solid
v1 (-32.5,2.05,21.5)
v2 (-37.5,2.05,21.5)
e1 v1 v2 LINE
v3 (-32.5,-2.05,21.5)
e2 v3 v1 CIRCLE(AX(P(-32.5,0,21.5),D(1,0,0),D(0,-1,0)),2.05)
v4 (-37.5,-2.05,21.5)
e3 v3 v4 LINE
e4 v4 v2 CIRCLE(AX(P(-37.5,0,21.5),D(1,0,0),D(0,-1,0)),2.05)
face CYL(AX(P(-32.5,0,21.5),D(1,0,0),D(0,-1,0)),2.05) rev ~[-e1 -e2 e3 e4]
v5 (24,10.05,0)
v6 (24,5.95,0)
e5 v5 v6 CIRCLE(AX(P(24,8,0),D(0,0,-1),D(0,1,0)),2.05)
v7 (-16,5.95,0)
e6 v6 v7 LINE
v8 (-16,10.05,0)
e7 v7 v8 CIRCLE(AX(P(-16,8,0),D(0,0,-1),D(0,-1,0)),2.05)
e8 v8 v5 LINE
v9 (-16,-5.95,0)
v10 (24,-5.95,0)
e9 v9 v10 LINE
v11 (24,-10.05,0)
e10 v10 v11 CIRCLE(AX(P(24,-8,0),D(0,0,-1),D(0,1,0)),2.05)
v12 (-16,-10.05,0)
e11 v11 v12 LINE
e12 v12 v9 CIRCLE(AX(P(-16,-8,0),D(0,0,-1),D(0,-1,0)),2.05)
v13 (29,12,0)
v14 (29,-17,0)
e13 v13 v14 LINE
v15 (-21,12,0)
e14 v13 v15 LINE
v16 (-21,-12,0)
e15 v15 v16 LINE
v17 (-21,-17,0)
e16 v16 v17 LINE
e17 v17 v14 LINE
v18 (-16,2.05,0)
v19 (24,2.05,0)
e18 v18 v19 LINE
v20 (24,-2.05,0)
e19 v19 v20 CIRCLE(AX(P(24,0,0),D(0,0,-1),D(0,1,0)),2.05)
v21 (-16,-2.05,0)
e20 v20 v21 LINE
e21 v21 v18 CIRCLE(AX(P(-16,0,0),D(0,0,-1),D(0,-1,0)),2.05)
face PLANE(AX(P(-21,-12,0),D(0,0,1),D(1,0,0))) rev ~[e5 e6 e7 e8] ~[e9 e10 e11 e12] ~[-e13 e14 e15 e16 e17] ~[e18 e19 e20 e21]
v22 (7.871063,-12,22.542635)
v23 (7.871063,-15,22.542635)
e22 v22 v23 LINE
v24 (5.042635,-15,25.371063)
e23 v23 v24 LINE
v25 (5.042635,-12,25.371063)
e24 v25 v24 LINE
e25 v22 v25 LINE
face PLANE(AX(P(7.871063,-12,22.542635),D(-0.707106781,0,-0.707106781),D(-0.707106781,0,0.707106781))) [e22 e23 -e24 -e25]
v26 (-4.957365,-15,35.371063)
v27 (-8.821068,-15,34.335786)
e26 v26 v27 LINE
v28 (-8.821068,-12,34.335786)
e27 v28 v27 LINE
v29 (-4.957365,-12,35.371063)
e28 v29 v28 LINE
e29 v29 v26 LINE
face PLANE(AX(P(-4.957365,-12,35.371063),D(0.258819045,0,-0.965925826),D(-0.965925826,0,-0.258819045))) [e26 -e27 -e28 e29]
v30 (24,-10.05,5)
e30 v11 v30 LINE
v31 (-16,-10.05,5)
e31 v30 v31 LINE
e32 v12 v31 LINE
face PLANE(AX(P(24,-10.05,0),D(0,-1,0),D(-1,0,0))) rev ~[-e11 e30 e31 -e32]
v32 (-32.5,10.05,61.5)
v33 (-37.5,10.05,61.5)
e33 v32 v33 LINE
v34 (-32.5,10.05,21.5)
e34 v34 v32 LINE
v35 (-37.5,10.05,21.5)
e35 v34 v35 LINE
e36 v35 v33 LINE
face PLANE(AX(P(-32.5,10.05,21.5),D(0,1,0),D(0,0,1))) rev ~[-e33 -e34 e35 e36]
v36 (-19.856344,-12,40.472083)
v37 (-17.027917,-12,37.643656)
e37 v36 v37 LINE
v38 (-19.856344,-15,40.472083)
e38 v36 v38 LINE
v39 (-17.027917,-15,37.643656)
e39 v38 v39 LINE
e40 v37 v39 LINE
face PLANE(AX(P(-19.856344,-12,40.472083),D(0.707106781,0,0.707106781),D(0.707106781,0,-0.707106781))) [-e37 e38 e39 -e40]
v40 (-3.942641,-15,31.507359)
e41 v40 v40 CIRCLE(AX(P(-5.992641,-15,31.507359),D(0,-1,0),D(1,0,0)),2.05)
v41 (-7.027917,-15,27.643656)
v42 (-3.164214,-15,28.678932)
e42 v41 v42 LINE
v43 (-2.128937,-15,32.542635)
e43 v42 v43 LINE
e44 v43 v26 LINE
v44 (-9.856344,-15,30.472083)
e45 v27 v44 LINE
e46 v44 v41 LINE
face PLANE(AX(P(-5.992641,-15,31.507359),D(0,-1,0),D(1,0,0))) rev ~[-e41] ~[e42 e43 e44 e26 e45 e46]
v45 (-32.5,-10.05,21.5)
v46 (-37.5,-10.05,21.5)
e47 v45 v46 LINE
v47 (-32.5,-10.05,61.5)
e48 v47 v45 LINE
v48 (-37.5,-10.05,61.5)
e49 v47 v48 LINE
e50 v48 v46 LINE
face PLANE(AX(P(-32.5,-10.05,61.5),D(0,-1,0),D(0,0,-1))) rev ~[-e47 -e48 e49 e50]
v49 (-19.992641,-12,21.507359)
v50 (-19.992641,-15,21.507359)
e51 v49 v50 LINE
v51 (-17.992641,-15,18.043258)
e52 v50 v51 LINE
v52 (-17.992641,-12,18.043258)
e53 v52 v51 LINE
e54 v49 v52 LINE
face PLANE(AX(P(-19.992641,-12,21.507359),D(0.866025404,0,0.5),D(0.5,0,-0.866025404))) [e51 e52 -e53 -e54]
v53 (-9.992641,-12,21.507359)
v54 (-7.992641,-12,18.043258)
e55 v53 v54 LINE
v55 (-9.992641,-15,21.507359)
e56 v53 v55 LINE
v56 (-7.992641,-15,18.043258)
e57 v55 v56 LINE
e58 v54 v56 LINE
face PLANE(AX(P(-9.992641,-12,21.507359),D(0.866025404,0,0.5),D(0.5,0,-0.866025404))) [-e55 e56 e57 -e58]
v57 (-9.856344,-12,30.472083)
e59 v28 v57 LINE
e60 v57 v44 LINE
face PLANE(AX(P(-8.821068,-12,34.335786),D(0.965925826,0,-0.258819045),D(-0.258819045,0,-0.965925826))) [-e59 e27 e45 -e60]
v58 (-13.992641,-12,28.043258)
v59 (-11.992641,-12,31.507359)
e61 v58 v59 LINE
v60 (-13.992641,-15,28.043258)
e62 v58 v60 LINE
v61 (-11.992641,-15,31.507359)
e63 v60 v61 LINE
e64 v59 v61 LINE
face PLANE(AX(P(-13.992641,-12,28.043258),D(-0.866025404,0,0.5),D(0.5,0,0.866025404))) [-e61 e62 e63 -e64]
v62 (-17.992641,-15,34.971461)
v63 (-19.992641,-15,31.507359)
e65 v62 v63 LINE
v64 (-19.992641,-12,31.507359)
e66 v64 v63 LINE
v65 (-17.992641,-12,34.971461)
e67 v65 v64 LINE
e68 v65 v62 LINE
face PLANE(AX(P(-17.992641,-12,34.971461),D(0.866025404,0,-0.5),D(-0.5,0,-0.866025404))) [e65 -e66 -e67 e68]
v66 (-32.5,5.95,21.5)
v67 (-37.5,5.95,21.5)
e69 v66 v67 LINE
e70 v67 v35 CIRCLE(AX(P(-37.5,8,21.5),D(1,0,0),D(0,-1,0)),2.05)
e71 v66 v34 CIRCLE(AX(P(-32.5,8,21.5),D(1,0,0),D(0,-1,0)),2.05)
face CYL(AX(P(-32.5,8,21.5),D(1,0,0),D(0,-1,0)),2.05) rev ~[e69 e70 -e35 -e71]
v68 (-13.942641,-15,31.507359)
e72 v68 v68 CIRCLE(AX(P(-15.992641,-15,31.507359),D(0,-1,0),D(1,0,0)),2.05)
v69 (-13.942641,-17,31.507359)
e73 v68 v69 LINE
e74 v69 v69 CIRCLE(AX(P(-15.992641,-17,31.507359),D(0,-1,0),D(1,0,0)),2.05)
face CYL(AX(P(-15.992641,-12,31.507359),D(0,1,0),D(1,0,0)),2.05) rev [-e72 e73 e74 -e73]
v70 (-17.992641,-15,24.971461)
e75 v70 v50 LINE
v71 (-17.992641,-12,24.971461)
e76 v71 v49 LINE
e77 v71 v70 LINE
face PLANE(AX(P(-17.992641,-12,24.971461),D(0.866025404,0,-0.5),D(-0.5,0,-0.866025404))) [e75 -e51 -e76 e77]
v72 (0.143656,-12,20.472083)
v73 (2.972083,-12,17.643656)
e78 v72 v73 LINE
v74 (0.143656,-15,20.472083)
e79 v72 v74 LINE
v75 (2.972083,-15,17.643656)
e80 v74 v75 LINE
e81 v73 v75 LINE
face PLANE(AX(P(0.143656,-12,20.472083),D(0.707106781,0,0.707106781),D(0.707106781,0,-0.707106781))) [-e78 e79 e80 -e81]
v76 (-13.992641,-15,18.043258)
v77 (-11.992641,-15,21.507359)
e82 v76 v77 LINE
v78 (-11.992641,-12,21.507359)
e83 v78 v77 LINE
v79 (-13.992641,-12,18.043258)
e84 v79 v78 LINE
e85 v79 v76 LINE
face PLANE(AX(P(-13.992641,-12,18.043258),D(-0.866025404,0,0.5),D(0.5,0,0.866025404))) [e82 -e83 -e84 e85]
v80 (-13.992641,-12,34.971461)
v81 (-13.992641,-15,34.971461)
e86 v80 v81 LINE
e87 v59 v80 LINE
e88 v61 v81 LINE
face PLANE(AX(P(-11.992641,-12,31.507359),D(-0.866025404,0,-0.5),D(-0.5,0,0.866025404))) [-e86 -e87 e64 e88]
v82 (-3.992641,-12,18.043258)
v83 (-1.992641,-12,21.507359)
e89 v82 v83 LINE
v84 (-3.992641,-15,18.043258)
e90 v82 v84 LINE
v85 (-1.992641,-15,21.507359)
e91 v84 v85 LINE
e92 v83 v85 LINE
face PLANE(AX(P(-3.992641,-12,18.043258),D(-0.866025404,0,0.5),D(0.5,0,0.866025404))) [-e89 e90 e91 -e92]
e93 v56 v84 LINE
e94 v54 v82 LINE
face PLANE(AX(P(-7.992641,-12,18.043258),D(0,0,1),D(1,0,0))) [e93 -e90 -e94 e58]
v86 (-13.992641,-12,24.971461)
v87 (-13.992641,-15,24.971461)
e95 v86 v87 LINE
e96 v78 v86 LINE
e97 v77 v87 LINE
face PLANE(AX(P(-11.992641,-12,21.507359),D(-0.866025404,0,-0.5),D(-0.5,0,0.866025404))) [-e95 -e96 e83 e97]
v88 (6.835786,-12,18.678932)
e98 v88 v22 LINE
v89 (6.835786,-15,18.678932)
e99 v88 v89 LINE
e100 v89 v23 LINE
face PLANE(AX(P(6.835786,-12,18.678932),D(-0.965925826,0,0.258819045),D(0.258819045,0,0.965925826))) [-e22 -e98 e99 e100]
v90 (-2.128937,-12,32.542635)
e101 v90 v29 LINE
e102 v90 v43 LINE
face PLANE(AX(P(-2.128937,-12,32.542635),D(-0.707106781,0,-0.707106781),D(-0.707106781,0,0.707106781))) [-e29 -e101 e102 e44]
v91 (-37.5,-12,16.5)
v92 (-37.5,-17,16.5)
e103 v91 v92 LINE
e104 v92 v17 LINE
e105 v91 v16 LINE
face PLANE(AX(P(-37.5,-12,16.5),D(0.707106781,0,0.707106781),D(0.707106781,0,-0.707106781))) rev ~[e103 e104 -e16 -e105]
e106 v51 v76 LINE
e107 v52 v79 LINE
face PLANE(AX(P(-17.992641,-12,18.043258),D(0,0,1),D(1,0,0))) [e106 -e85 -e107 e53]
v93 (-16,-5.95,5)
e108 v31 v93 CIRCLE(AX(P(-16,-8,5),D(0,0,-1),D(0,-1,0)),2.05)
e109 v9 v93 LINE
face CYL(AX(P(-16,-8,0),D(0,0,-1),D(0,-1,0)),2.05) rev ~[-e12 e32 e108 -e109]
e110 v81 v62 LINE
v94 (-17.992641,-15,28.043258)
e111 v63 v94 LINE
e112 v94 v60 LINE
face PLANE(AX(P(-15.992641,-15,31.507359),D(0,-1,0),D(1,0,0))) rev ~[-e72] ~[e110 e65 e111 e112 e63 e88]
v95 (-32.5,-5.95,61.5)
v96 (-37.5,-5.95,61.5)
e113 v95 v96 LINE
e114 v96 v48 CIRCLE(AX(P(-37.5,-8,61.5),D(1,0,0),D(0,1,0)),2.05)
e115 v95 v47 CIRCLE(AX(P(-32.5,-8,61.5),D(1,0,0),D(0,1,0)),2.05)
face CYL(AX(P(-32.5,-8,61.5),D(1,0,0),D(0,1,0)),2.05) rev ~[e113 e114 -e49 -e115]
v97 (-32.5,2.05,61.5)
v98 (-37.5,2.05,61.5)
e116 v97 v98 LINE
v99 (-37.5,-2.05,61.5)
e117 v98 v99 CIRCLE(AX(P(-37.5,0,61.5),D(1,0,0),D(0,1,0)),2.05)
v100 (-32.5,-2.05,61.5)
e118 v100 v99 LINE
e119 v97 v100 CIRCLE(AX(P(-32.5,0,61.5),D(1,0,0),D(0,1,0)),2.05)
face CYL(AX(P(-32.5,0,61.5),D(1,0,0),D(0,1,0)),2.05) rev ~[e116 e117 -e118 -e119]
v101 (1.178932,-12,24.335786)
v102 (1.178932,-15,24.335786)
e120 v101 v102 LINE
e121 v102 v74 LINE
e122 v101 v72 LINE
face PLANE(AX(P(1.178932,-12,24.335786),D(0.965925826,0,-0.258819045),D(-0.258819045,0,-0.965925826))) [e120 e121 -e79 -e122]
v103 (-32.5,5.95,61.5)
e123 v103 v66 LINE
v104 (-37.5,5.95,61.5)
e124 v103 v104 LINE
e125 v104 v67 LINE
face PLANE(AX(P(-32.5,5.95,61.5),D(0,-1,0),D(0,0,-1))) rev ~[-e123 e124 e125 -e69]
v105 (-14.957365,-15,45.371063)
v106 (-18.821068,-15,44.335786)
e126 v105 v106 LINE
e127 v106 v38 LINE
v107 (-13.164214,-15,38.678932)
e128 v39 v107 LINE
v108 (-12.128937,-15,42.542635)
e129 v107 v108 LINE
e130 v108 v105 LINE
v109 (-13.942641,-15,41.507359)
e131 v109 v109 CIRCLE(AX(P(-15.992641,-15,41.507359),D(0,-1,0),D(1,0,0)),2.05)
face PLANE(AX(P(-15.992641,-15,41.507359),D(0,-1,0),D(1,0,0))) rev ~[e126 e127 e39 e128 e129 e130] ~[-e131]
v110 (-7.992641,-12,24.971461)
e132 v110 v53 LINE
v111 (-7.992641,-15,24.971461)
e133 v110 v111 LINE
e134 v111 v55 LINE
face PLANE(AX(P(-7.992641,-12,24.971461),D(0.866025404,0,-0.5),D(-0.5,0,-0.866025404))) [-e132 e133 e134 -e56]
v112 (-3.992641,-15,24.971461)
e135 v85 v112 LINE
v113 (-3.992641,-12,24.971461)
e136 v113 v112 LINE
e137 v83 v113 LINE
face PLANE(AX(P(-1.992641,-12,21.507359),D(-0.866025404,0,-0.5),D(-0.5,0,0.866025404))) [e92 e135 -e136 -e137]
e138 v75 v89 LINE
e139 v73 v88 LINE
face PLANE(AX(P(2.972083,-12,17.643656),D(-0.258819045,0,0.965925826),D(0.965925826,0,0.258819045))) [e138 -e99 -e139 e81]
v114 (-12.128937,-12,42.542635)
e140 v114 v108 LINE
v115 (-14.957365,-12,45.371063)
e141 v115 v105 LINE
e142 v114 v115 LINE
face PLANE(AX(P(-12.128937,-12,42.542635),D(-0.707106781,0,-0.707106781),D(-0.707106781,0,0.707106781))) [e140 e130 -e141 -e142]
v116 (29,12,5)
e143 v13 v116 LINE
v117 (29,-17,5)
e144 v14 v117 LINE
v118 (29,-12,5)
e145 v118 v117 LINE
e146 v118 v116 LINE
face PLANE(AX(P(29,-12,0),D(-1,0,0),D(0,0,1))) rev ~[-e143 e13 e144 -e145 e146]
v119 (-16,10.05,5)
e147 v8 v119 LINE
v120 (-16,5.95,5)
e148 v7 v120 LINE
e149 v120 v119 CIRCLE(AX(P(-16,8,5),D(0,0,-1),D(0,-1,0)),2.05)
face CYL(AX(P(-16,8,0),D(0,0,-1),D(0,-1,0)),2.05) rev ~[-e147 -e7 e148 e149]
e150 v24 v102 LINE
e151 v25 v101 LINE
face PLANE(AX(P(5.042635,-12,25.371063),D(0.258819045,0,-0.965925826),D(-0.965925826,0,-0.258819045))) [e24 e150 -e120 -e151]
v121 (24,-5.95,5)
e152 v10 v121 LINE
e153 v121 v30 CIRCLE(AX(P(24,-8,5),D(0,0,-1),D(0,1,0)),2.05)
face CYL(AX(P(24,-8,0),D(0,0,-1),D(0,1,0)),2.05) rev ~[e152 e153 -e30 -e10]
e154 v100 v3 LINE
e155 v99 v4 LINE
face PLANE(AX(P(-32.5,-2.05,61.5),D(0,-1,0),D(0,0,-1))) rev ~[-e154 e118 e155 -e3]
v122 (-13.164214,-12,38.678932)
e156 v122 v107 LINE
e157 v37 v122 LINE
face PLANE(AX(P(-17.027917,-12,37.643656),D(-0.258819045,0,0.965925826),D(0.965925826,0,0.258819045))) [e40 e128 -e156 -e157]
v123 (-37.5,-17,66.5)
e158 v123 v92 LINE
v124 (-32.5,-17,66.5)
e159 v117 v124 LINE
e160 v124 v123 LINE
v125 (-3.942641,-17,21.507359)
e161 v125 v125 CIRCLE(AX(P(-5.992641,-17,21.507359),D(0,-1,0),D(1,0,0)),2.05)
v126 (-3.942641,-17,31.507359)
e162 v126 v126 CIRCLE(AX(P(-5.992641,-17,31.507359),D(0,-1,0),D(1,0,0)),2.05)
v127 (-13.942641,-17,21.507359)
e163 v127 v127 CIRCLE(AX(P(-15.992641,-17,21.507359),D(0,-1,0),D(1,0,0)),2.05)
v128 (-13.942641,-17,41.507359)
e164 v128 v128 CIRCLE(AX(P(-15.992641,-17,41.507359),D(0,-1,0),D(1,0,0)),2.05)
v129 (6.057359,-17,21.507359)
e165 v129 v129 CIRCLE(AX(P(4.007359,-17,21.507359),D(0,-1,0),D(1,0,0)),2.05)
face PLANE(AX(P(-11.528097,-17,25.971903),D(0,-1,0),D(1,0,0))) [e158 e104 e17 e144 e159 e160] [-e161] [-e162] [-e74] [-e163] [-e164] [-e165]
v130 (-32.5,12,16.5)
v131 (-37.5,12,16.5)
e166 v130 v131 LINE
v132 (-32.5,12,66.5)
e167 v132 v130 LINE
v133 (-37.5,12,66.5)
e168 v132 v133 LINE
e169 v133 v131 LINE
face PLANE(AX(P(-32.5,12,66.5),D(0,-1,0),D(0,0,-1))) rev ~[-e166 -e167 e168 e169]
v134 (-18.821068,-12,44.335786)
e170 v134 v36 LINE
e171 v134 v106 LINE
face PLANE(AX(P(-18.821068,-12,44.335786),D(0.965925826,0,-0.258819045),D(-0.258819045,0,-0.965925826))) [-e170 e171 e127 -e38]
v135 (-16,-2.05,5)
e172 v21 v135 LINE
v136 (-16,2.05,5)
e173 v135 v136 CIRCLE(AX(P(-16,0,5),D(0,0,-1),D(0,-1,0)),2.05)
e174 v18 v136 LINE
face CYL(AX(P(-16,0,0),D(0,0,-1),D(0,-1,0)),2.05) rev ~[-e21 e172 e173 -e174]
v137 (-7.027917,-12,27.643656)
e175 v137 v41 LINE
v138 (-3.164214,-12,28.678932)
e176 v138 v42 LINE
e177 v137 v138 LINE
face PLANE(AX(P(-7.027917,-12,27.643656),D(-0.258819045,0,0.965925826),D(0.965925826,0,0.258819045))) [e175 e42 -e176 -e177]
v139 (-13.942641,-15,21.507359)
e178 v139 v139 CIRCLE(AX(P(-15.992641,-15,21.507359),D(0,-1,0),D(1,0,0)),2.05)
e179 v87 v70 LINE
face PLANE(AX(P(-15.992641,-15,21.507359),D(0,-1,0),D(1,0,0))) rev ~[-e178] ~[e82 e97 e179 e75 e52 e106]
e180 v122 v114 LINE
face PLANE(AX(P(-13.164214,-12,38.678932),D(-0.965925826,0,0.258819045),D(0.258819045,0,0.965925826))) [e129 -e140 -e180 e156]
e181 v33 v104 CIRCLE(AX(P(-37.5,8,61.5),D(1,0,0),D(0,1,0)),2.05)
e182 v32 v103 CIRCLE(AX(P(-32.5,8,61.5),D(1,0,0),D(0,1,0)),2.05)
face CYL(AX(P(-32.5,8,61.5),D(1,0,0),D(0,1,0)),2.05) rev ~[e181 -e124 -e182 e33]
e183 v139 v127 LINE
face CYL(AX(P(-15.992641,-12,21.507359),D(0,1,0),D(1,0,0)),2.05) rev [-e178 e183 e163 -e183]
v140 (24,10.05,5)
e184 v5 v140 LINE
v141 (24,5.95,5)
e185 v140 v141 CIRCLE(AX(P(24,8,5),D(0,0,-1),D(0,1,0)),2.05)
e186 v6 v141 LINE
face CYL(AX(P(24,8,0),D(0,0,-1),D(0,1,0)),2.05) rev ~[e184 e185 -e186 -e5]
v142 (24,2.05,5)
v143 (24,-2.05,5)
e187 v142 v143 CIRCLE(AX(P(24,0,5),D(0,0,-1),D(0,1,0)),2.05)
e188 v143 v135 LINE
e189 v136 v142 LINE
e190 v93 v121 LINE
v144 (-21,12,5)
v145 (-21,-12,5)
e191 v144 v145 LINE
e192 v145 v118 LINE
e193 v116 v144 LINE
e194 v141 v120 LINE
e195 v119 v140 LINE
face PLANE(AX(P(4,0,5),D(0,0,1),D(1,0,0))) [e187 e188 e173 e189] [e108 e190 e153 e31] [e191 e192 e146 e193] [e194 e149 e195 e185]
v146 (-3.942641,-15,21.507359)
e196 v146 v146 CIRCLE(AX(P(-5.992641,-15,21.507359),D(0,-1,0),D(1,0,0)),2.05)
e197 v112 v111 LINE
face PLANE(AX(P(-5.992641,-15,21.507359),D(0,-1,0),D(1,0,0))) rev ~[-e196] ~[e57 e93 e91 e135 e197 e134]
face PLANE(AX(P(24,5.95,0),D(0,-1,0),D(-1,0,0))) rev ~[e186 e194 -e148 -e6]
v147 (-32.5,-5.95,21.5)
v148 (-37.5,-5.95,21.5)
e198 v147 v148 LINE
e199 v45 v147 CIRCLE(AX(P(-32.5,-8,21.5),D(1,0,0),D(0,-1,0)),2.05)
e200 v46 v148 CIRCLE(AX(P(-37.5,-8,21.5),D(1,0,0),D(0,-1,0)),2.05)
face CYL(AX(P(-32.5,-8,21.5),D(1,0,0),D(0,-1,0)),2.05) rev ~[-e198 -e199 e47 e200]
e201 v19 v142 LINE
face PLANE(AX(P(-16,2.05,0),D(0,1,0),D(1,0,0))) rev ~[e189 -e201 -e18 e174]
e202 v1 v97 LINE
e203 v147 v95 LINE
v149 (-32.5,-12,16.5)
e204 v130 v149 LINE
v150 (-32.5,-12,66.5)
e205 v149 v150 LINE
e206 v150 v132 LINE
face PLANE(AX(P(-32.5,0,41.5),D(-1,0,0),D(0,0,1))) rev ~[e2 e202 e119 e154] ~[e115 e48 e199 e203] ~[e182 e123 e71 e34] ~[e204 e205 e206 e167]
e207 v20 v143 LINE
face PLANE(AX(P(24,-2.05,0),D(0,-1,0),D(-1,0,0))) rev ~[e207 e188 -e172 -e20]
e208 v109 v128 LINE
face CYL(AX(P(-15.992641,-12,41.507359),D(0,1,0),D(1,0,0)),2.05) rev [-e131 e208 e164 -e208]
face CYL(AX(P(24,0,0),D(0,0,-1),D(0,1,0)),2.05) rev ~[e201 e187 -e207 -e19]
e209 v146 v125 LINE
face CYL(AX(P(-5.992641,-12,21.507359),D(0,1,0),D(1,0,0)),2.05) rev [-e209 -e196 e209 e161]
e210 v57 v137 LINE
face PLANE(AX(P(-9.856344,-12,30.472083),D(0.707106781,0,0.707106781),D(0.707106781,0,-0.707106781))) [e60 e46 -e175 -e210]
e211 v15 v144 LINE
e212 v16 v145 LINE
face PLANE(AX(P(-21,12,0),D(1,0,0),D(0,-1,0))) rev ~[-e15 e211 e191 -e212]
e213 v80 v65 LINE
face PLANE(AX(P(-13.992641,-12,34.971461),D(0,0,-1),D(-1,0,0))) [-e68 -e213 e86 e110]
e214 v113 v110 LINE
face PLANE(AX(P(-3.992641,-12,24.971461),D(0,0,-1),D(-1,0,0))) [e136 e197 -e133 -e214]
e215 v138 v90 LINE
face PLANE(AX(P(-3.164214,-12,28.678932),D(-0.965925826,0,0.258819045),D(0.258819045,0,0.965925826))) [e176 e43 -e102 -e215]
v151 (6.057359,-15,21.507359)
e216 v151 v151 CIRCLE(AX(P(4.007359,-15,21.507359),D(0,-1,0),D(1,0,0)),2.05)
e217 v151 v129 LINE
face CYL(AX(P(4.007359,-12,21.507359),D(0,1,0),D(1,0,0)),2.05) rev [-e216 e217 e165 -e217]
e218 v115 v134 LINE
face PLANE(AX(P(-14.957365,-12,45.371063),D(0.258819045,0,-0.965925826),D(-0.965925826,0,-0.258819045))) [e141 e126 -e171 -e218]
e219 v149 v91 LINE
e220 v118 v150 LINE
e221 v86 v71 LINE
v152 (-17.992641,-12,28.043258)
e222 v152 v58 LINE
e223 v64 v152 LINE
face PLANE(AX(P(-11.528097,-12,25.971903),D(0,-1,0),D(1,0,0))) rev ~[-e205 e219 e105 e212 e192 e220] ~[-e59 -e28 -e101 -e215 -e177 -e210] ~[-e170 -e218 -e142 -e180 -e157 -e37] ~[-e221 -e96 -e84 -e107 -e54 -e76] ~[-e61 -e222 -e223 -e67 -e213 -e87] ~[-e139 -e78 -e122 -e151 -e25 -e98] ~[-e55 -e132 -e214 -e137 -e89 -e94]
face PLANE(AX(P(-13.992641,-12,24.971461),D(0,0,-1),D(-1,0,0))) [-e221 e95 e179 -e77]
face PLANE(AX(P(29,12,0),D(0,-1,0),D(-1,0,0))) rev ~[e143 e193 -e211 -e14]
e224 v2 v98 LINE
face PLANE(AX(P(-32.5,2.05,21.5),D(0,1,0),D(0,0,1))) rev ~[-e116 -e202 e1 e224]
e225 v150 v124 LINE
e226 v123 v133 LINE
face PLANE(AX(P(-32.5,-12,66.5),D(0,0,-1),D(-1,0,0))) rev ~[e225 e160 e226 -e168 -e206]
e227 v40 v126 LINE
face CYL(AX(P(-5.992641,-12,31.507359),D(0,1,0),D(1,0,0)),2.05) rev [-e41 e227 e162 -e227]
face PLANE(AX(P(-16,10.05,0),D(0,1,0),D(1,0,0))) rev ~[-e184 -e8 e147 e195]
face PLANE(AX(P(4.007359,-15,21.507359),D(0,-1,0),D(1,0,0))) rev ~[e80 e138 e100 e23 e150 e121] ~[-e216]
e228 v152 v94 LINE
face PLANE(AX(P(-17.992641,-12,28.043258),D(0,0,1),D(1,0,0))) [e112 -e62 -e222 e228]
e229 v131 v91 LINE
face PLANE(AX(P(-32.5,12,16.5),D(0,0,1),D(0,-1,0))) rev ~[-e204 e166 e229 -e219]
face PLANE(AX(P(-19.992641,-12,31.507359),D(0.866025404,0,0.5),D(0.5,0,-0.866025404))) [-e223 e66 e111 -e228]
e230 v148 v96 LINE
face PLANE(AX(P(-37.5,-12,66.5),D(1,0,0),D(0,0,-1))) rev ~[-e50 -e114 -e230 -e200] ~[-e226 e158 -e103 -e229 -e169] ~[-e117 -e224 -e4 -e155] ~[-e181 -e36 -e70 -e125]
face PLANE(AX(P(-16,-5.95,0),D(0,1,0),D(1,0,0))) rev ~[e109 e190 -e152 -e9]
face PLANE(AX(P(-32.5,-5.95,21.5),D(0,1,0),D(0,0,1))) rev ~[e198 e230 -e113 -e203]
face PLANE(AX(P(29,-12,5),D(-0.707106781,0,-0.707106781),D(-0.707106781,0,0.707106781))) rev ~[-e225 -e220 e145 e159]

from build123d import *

# Parameters (mm, degrees)
F1_DEPTH = 5
F3_ANGLE = 90
F7_R     = 2.05
F8_DEPTH = 5
F9_DEPTH = 3


# Not quite as in the source:
# - a feature names something its author has since deleted; it is built from what else it names


with BuildPart() as f1:
    # F0 (on Top) → F1 (new body)
    with BuildSketch(Plane.XY):
        Polygon((29, 12), (-21, 12), (-21, -12), (0, -12), (29, -12), align=None)
        with BuildLine():
            ThreePointArc((-16, -10.05), (-18.05, -8), (-16, -5.95))
            Line((-16, -5.95), (0, -5.95))
            Line((0, -5.95), (24, -5.95))
            ThreePointArc((24, -5.95), (26.05, -8), (24, -10.05))
            Line((24, -10.05), (0, -10.05))
            Line((0, -10.05), (-16, -10.05))
        make_face(mode=Mode.SUBTRACT)
        with BuildLine():
            Line((0, -2.05), (-16, -2.05))
            ThreePointArc((-16, -2.05), (-18.05, 0), (-16, 2.05))
            Line((-16, 2.05), (0, 2.05))
            Line((0, 2.05), (24, 2.05))
            ThreePointArc((24, 2.05), (26.05, 0), (24, -2.05))
            Line((24, -2.05), (0, -2.05))
        make_face(mode=Mode.SUBTRACT)
        with BuildLine():
            Line((24, 5.95), (0, 5.95))
            Line((0, 5.95), (-16, 5.95))
            ThreePointArc((-16, 5.95), (-18.05, 8), (-16, 10.05))
            Line((-16, 10.05), (0, 10.05))
            Line((0, 10.05), (24, 10.05))
            ThreePointArc((24, 10.05), (26.05, 8), (24, 5.95))
        make_face(mode=Mode.SUBTRACT)
    extrude(amount=F1_DEPTH)


with BuildPart() as f3_1:
    # F3: copy of F1
    add(f1.part.rotate(Axis((-21, 0, 2.5), (0, -1, 0)), F3_ANGLE))


with BuildPart() as f3_1_1:
    # F4: moved
    add(f3_1.part.moved(Location((0, 0, 14))))


with BuildPart() as f3_1_2:
    # F5: moved
    add(f3_1_1.part.moved(Location((-14, 0, 0))))


with BuildPart() as f1_1:
    add(f1.part)

    add(f3_1_2.part)  # F8 merges F3_1
    # F7 (on 3pt) → F8 (join)
    with BuildSketch(Plane.XZ.offset(12)):
        Polygon((-37.5, 16.5), (-21, 0), (29, 0), (29, 5), (-32.5, 66.5), (-37.5, 66.5), align=None)
        Polygon((-19.9926406871, 21.5073593129), (-17.9926406871, 24.971460928), (-13.9926406871, 24.971460928), (-11.9926406871, 21.5073593129), (-13.9926406871, 18.0432576977), (-17.9926406871, 18.0432576977), align=None, mode=Mode.SUBTRACT)
        Polygon((-9.9926406871, 21.5073593129), (-7.9926406871, 24.971460928), (-3.9926406871, 24.971460928), (-1.9926406871, 21.5073593129), (-3.9926406871, 18.0432576977), (-7.9926406871, 18.0432576977), align=None, mode=Mode.SUBTRACT)
        Polygon((-19.9926406871, 31.5073593129), (-17.9926406871, 34.971460928), (-13.9926406871, 34.971460928), (-11.9926406871, 31.5073593129), (-13.9926406871, 28.0432576977), (-17.9926406871, 28.0432576977), align=None, mode=Mode.SUBTRACT)
        Polygon((-9.8563439923, 30.4720831325), (-8.8210678119, 34.3357864376), (-4.9573645067, 35.371062618), (-2.128937382, 32.5426354933), (-3.1642135624, 28.6789321881), (-7.0279168675, 27.6436560077), align=None, mode=Mode.SUBTRACT)
        Polygon((0.1436560077, 20.4720831325), (1.1789321881, 24.3357864376), (5.0426354933, 25.371062618), (7.871062618, 22.5426354933), (6.8357864376, 18.6789321881), (2.9720831325, 17.6436560077), align=None, mode=Mode.SUBTRACT)
        Polygon((-19.8563439923, 40.4720831325), (-18.8210678119, 44.3357864376), (-14.9573645067, 45.371062618), (-12.128937382, 42.5426354933), (-13.1642135624, 38.6789321881), (-17.0279168675, 37.6436560077), align=None, mode=Mode.SUBTRACT)
        Polygon((-4.9573645067, 35.371062618), (-8.8210678119, 34.3357864376), (-9.8563439923, 30.4720831325), (-7.0279168675, 27.6436560077), (-3.1642135624, 28.6789321881), (-2.128937382, 32.5426354933), align=None)
        with Locations((-5.9926406871, 31.5073593129)):
            Circle(F7_R, mode=Mode.SUBTRACT)
        Polygon((-14.9573645067, 45.371062618), (-18.8210678119, 44.3357864376), (-19.8563439923, 40.4720831325), (-17.0279168675, 37.6436560077), (-13.1642135624, 38.6789321881), (-12.128937382, 42.5426354933), align=None)
        with Locations((-15.9926406871, 41.5073593129)):
            Circle(F7_R, mode=Mode.SUBTRACT)
        Polygon((-13.9926406871, 34.971460928), (-17.9926406871, 34.971460928), (-19.9926406871, 31.5073593129), (-17.9926406871, 28.0432576977), (-13.9926406871, 28.0432576977), (-11.9926406871, 31.5073593129), align=None)
        with Locations((-15.9926406871, 31.5073593129)):
            Circle(F7_R, mode=Mode.SUBTRACT)
        Polygon((-13.9926406871, 24.971460928), (-17.9926406871, 24.971460928), (-19.9926406871, 21.5073593129), (-17.9926406871, 18.0432576977), (-13.9926406871, 18.0432576977), (-11.9926406871, 21.5073593129), align=None)
        with Locations((-15.9926406871, 21.5073593129)):
            Circle(F7_R, mode=Mode.SUBTRACT)
        Polygon((-3.9926406871, 24.971460928), (-7.9926406871, 24.971460928), (-9.9926406871, 21.5073593129), (-7.9926406871, 18.0432576977), (-3.9926406871, 18.0432576977), (-1.9926406871, 21.5073593129), align=None)
        with Locations((-5.9926406871, 21.5073593129)):
            Circle(F7_R, mode=Mode.SUBTRACT)
        Polygon((5.0426354933, 25.371062618), (1.1789321881, 24.3357864376), (0.1436560077, 20.4720831325), (2.9720831325, 17.6436560077), (6.8357864376, 18.6789321881), (7.871062618, 22.5426354933), align=None)
        with Locations((4.0073593129, 21.5073593129)):
            Circle(F7_R, mode=Mode.SUBTRACT)
    extrude(amount=F8_DEPTH)

    # F7 (on 3pt) → F9 (cut)
    with BuildSketch(Plane.XZ.offset(12)):
        Polygon((-4.9573645067, 35.371062618), (-8.8210678119, 34.3357864376), (-9.8563439923, 30.4720831325), (-7.0279168675, 27.6436560077), (-3.1642135624, 28.6789321881), (-2.128937382, 32.5426354933), align=None)
        with Locations((-5.9926406871, 31.5073593129)):
            Circle(F7_R, mode=Mode.SUBTRACT)
        Polygon((5.0426354933, 25.371062618), (1.1789321881, 24.3357864376), (0.1436560077, 20.4720831325), (2.9720831325, 17.6436560077), (6.8357864376, 18.6789321881), (7.871062618, 22.5426354933), align=None)
        with Locations((4.0073593129, 21.5073593129)):
            Circle(F7_R, mode=Mode.SUBTRACT)
        Polygon((-3.9926406871, 24.971460928), (-7.9926406871, 24.971460928), (-9.9926406871, 21.5073593129), (-7.9926406871, 18.0432576977), (-3.9926406871, 18.0432576977), (-1.9926406871, 21.5073593129), align=None)
        with Locations((-5.9926406871, 21.5073593129)):
            Circle(F7_R, mode=Mode.SUBTRACT)
        Polygon((-13.9926406871, 24.971460928), (-17.9926406871, 24.971460928), (-19.9926406871, 21.5073593129), (-17.9926406871, 18.0432576977), (-13.9926406871, 18.0432576977), (-11.9926406871, 21.5073593129), align=None)
        with Locations((-15.9926406871, 21.5073593129)):
            Circle(F7_R, mode=Mode.SUBTRACT)
        Polygon((-13.9926406871, 34.971460928), (-17.9926406871, 34.971460928), (-19.9926406871, 31.5073593129), (-17.9926406871, 28.0432576977), (-13.9926406871, 28.0432576977), (-11.9926406871, 31.5073593129), align=None)
        with Locations((-15.9926406871, 31.5073593129)):
            Circle(F7_R, mode=Mode.SUBTRACT)
        Polygon((-14.9573645067, 45.371062618), (-18.8210678119, 44.3357864376), (-19.8563439923, 40.4720831325), (-17.0279168675, 37.6436560077), (-13.1642135624, 38.6789321881), (-12.128937382, 42.5426354933), align=None)
        with Locations((-15.9926406871, 41.5073593129)):
            Circle(F7_R, mode=Mode.SUBTRACT)
    extrude(amount=F9_DEPTH, mode=Mode.SUBTRACT)


solid = f1_1.part
